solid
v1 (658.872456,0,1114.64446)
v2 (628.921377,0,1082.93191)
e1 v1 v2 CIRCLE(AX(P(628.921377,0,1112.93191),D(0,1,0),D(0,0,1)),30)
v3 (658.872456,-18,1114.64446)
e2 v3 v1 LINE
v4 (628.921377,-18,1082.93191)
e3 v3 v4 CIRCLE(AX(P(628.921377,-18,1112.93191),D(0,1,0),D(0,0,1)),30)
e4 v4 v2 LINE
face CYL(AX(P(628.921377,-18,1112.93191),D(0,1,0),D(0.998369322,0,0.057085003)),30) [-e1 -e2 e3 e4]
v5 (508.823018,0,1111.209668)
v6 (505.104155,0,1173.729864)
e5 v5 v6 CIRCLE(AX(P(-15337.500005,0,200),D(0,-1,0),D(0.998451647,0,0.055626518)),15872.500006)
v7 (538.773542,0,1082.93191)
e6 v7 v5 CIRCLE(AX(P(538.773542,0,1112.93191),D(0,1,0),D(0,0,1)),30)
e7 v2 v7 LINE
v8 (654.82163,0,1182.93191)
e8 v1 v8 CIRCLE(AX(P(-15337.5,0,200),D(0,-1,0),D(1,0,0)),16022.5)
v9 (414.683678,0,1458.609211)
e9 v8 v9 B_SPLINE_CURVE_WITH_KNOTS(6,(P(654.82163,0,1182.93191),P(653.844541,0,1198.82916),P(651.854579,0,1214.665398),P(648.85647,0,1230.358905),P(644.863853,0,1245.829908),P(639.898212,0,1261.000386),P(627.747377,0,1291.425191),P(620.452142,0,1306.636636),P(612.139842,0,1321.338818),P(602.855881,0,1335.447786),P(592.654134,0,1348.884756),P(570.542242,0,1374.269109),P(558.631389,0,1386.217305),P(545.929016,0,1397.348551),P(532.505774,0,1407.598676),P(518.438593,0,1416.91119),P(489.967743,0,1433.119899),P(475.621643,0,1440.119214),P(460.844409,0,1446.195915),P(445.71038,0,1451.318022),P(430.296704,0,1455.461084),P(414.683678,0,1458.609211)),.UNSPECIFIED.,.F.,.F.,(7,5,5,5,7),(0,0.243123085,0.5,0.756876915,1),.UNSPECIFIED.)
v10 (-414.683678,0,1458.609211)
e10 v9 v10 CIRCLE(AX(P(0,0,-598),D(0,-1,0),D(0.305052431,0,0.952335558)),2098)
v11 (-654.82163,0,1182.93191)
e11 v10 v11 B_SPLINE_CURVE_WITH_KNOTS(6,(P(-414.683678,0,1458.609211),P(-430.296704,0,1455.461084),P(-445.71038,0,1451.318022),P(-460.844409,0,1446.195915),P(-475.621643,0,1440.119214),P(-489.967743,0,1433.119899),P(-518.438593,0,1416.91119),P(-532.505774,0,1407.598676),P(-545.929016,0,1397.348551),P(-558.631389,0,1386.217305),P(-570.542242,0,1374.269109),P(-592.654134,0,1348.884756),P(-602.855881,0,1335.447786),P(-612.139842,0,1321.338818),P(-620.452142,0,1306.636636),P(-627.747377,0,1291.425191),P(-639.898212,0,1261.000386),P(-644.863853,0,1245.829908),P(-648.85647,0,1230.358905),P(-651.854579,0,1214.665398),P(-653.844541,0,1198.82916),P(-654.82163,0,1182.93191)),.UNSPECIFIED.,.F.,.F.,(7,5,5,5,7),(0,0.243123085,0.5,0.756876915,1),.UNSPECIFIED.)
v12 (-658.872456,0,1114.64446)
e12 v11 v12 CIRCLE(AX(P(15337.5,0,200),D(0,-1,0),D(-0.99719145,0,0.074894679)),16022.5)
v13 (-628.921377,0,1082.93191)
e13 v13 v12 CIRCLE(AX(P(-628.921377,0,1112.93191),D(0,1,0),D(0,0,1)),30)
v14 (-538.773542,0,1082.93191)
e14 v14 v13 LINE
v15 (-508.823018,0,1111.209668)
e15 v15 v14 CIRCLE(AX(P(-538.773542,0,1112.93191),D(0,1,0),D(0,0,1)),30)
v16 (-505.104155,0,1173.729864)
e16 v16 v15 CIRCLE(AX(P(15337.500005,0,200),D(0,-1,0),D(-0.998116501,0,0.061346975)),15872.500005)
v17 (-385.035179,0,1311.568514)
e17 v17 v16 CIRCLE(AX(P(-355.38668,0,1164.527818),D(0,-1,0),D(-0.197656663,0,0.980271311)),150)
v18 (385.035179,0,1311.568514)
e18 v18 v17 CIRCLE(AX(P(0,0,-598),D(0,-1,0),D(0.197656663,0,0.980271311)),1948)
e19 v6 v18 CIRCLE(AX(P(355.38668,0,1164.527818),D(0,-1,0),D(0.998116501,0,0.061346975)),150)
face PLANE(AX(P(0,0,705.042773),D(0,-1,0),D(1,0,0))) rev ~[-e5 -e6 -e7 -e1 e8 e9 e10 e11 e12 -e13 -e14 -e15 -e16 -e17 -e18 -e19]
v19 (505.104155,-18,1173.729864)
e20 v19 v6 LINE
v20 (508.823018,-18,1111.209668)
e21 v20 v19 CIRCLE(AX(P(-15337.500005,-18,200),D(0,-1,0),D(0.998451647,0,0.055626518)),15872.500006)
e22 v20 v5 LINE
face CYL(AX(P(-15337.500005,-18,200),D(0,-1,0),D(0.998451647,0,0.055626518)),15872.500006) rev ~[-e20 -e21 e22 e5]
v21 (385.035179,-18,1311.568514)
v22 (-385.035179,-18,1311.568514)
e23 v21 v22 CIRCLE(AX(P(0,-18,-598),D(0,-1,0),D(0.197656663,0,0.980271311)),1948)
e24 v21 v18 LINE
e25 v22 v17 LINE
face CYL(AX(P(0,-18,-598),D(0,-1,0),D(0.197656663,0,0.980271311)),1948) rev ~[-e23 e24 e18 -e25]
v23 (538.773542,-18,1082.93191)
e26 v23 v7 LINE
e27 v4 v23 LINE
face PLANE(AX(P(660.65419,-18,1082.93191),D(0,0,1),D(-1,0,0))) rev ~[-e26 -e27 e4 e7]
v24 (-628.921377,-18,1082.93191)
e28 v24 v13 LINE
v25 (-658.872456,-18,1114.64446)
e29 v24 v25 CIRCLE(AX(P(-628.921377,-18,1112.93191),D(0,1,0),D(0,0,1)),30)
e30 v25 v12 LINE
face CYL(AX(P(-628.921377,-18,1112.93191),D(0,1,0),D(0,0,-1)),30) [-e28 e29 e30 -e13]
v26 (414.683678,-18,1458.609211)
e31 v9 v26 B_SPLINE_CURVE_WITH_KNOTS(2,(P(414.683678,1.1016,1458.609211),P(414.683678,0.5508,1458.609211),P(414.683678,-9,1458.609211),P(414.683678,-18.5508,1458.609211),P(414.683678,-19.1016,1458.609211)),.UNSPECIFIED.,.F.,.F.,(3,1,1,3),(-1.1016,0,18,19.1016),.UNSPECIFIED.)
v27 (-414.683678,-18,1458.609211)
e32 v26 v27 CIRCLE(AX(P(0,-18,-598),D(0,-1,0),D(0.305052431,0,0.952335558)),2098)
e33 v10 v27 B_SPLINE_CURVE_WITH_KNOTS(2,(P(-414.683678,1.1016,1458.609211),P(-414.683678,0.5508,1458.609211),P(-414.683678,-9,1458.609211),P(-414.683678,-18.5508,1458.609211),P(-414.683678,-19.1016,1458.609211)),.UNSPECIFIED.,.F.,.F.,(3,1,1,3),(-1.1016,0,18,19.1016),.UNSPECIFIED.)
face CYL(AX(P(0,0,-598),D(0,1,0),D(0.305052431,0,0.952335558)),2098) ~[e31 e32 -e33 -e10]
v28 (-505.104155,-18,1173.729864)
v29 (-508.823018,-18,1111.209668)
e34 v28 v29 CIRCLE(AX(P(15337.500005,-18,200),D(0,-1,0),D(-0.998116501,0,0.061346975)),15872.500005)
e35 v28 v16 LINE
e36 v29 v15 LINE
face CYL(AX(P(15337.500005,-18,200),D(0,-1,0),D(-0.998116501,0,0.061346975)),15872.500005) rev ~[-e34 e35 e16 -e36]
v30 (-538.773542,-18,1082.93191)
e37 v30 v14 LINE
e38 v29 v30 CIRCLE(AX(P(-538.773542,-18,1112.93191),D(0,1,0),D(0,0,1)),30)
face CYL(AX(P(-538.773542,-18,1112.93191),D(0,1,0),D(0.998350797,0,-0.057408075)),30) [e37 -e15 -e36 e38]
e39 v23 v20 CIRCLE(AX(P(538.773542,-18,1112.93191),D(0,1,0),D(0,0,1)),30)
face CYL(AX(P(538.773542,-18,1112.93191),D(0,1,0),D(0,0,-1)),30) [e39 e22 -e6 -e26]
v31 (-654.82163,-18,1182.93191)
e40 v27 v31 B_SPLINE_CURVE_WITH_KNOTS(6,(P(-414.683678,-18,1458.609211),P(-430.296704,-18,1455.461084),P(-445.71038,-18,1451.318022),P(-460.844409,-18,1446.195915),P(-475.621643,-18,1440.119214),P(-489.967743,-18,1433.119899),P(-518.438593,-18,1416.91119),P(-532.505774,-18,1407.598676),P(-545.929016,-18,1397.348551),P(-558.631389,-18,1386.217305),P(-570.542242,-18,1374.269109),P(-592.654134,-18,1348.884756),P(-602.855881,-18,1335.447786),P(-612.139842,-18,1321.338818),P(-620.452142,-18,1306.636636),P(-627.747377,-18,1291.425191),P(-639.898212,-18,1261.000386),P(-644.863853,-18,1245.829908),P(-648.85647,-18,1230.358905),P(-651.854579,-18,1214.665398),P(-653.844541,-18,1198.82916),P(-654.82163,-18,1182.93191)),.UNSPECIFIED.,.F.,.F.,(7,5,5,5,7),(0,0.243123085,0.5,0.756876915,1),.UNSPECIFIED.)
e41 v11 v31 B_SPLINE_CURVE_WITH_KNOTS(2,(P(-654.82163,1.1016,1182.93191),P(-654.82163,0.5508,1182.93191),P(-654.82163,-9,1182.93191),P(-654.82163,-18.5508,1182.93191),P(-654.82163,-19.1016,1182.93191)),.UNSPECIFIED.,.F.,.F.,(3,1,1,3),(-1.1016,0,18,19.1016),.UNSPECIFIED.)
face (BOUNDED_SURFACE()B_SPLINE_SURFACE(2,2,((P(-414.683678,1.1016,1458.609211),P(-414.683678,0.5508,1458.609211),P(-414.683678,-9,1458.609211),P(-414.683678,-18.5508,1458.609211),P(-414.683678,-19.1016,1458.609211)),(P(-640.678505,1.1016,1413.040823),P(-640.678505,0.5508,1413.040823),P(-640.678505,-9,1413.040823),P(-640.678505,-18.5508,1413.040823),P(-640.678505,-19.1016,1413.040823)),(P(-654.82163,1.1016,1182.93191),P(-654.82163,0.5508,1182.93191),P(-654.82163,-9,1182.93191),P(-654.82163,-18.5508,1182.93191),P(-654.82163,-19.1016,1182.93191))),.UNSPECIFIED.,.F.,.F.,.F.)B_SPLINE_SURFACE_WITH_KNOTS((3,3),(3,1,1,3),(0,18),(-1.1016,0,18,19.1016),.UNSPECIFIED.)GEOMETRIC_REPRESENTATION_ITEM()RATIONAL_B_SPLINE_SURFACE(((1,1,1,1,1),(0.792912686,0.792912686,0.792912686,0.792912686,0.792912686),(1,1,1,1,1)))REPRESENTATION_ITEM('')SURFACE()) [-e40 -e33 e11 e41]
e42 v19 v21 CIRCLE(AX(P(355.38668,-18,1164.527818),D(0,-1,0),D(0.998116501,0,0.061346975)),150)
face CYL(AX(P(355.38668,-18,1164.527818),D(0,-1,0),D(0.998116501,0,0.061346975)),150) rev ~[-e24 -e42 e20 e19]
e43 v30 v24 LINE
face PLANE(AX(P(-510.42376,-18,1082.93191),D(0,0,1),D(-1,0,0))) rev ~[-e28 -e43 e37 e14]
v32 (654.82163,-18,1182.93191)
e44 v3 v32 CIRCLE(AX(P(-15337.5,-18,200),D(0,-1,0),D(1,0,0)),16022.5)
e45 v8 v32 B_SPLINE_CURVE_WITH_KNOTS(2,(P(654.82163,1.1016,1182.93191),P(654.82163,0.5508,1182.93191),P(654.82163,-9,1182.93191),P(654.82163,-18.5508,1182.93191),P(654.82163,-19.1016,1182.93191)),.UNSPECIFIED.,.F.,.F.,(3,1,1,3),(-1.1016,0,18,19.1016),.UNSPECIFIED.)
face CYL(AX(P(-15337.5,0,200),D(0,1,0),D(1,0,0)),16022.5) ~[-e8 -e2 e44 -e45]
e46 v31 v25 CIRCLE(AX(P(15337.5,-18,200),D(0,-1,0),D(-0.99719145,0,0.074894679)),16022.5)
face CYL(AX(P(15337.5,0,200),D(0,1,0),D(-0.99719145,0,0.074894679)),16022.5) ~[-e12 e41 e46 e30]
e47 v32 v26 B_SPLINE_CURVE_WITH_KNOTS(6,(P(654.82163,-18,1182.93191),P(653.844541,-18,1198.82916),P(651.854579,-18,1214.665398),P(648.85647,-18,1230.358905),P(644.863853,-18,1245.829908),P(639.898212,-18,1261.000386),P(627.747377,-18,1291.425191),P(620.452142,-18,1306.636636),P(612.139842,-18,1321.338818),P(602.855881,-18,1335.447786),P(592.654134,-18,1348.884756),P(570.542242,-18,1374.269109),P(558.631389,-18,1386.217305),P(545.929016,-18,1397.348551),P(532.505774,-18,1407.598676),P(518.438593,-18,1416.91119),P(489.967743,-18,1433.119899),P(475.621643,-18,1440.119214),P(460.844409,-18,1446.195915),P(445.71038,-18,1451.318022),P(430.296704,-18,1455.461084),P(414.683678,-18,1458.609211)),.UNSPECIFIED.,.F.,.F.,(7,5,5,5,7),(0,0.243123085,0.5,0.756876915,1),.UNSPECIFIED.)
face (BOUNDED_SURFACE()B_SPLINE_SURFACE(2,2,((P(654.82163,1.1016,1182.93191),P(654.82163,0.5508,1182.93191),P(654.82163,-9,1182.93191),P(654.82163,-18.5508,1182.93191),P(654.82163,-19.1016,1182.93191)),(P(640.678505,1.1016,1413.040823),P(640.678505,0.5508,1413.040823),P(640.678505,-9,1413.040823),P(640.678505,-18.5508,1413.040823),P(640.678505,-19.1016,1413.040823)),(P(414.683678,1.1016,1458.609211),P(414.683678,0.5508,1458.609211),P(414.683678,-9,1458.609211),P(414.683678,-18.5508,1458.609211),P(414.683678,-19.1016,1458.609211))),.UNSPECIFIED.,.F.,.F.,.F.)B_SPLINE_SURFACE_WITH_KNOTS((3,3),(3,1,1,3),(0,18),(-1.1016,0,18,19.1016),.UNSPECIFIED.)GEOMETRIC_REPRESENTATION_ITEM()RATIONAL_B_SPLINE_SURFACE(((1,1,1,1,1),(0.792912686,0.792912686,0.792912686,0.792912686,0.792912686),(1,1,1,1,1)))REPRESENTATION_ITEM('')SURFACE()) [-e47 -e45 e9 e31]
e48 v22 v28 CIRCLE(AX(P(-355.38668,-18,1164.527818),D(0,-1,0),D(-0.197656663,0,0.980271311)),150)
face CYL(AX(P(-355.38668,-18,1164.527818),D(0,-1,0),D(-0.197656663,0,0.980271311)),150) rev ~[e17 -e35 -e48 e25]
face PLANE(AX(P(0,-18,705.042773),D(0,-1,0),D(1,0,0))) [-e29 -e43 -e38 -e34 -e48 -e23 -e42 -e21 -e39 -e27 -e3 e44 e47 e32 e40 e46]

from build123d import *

# Parameters (mm, degrees)
F1_DEPTH = 18
F2_R     = 300
F4_DEPTH = 18.0010001
F5_R     = 30


# Not quite as in the source:
# - a feature names something its author has since deleted; it is built from what else it names


with BuildPart() as f1:
    # F0 (on Front) → F1 (new body)
    with BuildSketch(Plane.XZ):
        with BuildLine():
            Line((-685, 200), (-685, 0))
            Line((-685, 0), (685, 0))
            Line((685, 0), (685, 200))
            ThreePointArc((685, 200), (673.7460477003, 800.4217267888), (640, 1400))
            ThreePointArc((640, 1400), (0, 1500), (-640, 1400))
            ThreePointArc((-640, 1400), (-673.7460477003, 800.4217267888), (-685, 200))
        make_face()
    extrude(amount=F1_DEPTH)

    # F2
    f2_edges = [f1.edges().sort_by_distance(p)[0] for p in [
        (-640, -9, 1400),
        (640, -9, 1400),
    ]]
    fillet(f2_edges, radius=F2_R)

    # F3 (on face) → F4 (cut, through all)
    with BuildSketch(Plane.XZ.offset(18)):
        with BuildLine():
            ThreePointArc((-385.0351790184, 1311.5685143294), (-468.492433607, 1263.0523750474), (-505.1041546871, 1173.7298639214))
            ThreePointArc((-505.1041546871, 1173.7298639214), (-507.8289943623, 1128.3346974136), (-510.4237596585, 1082.9319102019))
            Line((-510.4237596585, 1082.9319102019), (-660.6541901542, 1082.9319102019))
            ThreePointArc((-660.6541901542, 1082.9319102019), (-678.9123910716, 641.6337499869), (-685, 200))
            Line((-685, 200), (-685, 0))
            Line((-685, 0), (685, 0))
            Line((685, 0), (685, 200))
            ThreePointArc((685, 200), (678.9123910716, 641.6337499869), (660.6541901542, 1082.9319102019))
            Line((660.6541901542, 1082.9319102019), (510.4237596585, 1082.9319102019))
            ThreePointArc((510.4237596585, 1082.9319102019), (507.8289943623, 1128.3346974136), (505.1041546871, 1173.7298639214))
            ThreePointArc((505.1041546871, 1173.7298639214), (468.492433607, 1263.0523750474), (385.0351790184, 1311.5685143294))
            ThreePointArc((385.0351790184, 1311.5685143294), (0, 1350), (-385.0351790184, 1311.5685143294))
        make_face()
    extrude(amount=-F4_DEPTH, mode=Mode.SUBTRACT)

    # F5
    f5_edges = [f1.edges().sort_by_distance(p)[0] for p in [
        (-510.42376, -9, 1082.93191),
        (510.42376, -9, 1082.93191),
        (-660.65419, -9, 1082.93191),
        (660.65419, -9, 1082.93191),
    ]]
    fillet(f5_edges, radius=F5_R)


solid = f1.part
